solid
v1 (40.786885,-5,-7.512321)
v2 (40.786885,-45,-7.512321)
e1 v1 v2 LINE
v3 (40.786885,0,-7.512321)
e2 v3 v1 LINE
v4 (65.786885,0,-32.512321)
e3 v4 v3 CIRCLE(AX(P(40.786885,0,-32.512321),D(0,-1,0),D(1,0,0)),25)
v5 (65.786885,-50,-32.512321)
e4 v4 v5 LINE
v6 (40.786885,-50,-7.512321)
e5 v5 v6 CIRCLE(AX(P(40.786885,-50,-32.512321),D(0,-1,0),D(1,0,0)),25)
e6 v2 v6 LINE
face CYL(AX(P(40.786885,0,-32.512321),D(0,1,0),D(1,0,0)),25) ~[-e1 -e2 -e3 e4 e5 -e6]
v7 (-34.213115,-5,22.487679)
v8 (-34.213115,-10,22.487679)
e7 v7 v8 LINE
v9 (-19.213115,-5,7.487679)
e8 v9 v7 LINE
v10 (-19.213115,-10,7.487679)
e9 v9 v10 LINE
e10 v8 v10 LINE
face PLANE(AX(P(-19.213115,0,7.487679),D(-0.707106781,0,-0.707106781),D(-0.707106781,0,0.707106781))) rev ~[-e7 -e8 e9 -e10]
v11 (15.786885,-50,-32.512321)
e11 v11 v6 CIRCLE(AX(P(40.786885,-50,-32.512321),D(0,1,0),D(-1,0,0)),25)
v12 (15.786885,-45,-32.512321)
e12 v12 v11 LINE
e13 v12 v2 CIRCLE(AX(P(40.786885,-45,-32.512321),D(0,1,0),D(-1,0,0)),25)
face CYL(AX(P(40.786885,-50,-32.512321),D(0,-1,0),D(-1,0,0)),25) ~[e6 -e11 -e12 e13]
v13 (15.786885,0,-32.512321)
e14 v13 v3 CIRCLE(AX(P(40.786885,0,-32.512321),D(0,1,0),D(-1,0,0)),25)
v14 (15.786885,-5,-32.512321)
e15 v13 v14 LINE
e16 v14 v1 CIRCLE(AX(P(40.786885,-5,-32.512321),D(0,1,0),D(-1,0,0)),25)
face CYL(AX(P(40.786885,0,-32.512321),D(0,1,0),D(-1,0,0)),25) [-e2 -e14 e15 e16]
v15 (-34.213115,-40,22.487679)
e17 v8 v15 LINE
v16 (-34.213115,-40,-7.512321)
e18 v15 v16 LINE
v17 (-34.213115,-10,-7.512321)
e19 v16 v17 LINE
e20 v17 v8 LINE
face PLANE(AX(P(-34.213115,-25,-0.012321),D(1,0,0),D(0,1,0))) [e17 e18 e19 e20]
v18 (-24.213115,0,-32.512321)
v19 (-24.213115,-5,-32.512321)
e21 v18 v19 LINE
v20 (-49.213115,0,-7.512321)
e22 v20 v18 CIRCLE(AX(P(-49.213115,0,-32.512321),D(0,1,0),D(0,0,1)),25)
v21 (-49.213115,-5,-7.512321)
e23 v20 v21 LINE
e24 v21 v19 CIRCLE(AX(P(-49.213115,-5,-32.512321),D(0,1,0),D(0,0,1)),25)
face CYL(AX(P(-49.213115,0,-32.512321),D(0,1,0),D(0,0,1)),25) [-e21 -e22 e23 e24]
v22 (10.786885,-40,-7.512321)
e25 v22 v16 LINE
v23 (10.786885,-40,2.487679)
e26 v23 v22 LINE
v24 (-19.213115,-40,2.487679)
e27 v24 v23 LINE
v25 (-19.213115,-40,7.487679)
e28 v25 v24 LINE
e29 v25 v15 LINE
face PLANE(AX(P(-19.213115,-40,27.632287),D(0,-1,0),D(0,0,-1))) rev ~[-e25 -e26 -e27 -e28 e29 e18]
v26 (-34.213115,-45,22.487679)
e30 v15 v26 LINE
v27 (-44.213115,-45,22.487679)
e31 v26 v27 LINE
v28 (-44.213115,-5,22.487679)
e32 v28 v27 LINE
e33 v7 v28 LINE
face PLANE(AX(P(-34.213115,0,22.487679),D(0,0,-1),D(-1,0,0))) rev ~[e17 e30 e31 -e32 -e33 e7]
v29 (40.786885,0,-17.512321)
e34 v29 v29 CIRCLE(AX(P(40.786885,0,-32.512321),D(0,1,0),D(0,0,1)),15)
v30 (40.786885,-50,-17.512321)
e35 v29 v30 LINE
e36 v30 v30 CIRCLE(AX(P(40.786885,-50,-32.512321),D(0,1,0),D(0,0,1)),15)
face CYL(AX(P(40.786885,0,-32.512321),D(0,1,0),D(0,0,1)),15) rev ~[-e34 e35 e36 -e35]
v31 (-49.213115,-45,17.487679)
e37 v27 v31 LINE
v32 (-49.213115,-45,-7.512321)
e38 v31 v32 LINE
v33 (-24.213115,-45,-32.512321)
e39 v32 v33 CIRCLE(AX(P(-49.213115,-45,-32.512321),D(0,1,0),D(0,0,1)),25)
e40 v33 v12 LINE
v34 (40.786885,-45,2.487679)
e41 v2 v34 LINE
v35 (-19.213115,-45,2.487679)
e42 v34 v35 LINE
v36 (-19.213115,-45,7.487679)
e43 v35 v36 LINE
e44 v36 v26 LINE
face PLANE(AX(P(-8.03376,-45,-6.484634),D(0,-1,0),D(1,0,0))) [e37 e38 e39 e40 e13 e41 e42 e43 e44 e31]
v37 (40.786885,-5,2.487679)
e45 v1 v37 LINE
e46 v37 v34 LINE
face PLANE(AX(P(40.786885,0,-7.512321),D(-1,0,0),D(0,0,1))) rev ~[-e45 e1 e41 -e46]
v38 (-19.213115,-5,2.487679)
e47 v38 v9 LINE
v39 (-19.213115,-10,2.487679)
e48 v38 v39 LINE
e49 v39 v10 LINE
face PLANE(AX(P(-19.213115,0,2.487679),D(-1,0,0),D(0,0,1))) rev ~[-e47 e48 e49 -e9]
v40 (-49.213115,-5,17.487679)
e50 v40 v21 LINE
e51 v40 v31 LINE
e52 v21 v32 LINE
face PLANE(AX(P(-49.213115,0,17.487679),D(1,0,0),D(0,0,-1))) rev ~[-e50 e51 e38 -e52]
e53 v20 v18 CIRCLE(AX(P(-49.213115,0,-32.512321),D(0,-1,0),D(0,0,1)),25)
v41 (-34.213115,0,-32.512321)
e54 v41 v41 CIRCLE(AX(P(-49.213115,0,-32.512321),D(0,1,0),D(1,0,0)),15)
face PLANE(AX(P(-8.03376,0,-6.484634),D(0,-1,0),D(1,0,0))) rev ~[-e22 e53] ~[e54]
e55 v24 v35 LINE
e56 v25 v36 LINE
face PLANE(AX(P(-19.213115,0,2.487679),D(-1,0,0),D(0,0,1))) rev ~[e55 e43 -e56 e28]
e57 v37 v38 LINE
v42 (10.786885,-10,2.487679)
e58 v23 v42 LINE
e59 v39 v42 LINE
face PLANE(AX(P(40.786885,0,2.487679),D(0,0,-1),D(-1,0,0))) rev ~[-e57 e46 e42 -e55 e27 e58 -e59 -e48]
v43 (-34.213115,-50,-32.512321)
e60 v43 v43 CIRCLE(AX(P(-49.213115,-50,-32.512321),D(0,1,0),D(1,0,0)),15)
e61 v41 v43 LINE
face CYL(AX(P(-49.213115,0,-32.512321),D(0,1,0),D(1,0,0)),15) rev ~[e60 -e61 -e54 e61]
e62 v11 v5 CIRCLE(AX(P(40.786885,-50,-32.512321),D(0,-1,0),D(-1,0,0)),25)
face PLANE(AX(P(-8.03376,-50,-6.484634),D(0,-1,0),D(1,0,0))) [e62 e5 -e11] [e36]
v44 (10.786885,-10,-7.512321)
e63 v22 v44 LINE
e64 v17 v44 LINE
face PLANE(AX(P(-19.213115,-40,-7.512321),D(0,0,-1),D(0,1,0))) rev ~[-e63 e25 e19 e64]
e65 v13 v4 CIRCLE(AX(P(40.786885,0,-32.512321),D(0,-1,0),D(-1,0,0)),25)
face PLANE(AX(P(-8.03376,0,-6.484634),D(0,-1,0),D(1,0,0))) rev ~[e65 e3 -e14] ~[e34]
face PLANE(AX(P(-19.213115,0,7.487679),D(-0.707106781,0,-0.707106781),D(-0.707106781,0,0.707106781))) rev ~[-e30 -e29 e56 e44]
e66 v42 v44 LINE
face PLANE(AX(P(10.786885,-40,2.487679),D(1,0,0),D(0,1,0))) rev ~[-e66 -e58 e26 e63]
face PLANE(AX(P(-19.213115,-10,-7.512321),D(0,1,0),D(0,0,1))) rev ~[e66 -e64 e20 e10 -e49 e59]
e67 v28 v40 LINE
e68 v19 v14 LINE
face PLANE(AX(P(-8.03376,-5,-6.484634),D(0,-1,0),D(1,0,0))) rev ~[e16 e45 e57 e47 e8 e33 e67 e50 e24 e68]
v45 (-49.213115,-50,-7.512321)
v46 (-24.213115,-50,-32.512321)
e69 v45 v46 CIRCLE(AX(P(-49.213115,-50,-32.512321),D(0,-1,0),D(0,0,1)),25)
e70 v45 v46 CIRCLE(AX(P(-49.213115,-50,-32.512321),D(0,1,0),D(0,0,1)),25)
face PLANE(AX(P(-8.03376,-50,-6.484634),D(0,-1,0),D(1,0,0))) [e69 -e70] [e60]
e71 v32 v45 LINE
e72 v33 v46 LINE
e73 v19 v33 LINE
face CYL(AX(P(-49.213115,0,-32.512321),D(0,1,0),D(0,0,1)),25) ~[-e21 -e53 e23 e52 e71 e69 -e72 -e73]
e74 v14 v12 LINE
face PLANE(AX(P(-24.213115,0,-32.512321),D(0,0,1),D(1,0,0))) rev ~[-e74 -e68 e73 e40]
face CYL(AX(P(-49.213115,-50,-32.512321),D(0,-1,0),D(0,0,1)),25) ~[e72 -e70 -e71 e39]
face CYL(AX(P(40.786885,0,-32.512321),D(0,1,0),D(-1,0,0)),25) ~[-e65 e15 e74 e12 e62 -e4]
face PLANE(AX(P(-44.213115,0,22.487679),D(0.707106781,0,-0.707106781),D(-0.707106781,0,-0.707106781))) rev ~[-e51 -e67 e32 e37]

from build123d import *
from build123d import SkipClean  # not in build123d's __all__

# Parameters (mm, degrees)
F1_DEPTH = 50
F2_DEPTH = 5
F4_DEPTH = 5
F5_W     = 30
F5_H     = 30
F6_DEPTH = 10
F7_W     = 30
F7_H     = 20.1446080953
F8_DEPTH = 15


with BuildPart() as f1:
    # F0 (on Front) → F1 (new body)
    with BuildSketch(Plane.XZ):
        with BuildLine():
            Line((-34.2131151259, 22.4876786768), (-44.2131151259, 22.4876786768))
            Line((-44.2131151259, 22.4876786768), (-49.2131151259, 17.4876786768))
            Line((-49.2131151259, 17.4876786768), (-49.2131151259, -7.5123213232))
            ThreePointArc((-49.2131151259, -7.5123213232), (-31.5354455962, -14.8346517935), (-24.2131151259, -32.5123213232))
            Line((-24.2131151259, -32.5123213232), (15.7868848741, -32.5123213232))
            ThreePointArc((15.7868848741, -32.5123213232), (23.1092153444, -14.8346517935), (40.7868848741, -7.5123213232))
            Line((40.7868848741, -7.5123213232), (40.7868848741, 2.4876786768))
            Line((40.7868848741, 2.4876786768), (-19.2131151259, 2.4876786768))
            Line((-19.2131151259, 2.4876786768), (-19.2131151259, 7.4876786768))
            Line((-19.2131151259, 7.4876786768), (-34.2131151259, 22.4876786768))
        make_face()
        with BuildLine():
            Line((-49.2131151259, -17.5123213232), (-49.2131151259, -7.5123213232))
            ThreePointArc((-49.2131151259, -7.5123213232), (-66.8907846556, -50.1899908528), (-24.2131151259, -32.5123213232))
            Line((-24.2131151259, -32.5123213232), (-34.2131151259, -32.5123213232))
            ThreePointArc((-34.2131151259, -32.5123213232), (-59.8197168437, -43.118923041), (-49.2131151259, -17.5123213232))
        make_face()
        with BuildLine():
            ThreePointArc((-24.2131151259, -32.5123213232), (-31.5354455962, -14.8346517935), (-49.2131151259, -7.5123213232))
            Line((-49.2131151259, -7.5123213232), (-49.2131151259, -17.5123213232))
            ThreePointArc((-49.2131151259, -17.5123213232), (-38.6065134081, -21.9057196054), (-34.2131151259, -32.5123213232))
            Line((-34.2131151259, -32.5123213232), (-24.2131151259, -32.5123213232))
        make_face()
        with BuildLine():
            ThreePointArc((40.7868848741, -7.5123213232), (23.1092153444, -14.8346517935), (15.7868848741, -32.5123213232))
            Line((15.7868848741, -32.5123213232), (25.7868848741, -32.5123213232))
            ThreePointArc((25.7868848741, -32.5123213232), (30.1802831563, -21.9057196054), (40.7868848741, -17.5123213232))
            Line((40.7868848741, -17.5123213232), (40.7868848741, -7.5123213232))
        make_face()
        with BuildLine():
            Line((25.7868848741, -32.5123213232), (15.7868848741, -32.5123213232))
            ThreePointArc((15.7868848741, -32.5123213232), (40.7868848741, -57.5123213232), (65.7868848741, -32.5123213232))
            ThreePointArc((65.7868848741, -32.5123213232), (58.4645544038, -14.8346517935), (40.7868848741, -7.5123213232))
            Line((40.7868848741, -7.5123213232), (40.7868848741, -17.5123213232))
            ThreePointArc((40.7868848741, -17.5123213232), (51.3934865919, -21.9057196054), (55.7868848741, -32.5123213232))
            ThreePointArc((55.7868848741, -32.5123213232), (40.7868848741, -47.5123213232), (25.7868848741, -32.5123213232))
        make_face()
    extrude(amount=F1_DEPTH)

    # F0 (on Front) → F2 (cut)
    with BuildSketch(Plane.XZ):
        with BuildLine():
            Line((-34.2131151259, 22.4876786768), (-44.2131151259, 22.4876786768))
            Line((-44.2131151259, 22.4876786768), (-49.2131151259, 17.4876786768))
            Line((-49.2131151259, 17.4876786768), (-49.2131151259, -7.5123213232))
            ThreePointArc((-49.2131151259, -7.5123213232), (-31.5354455962, -14.8346517935), (-24.2131151259, -32.5123213232))
            Line((-24.2131151259, -32.5123213232), (15.7868848741, -32.5123213232))
            ThreePointArc((15.7868848741, -32.5123213232), (23.1092153444, -14.8346517935), (40.7868848741, -7.5123213232))
            Line((40.7868848741, -7.5123213232), (40.7868848741, 2.4876786768))
            Line((40.7868848741, 2.4876786768), (-19.2131151259, 2.4876786768))
            Line((-19.2131151259, 2.4876786768), (-19.2131151259, 7.4876786768))
            Line((-19.2131151259, 7.4876786768), (-34.2131151259, 22.4876786768))
        make_face()
    extrude(amount=F2_DEPTH, mode=Mode.SUBTRACT)

    # F3 (on face) → F4 (cut)
    with BuildSketch(Plane.XZ.offset(50)):
        with BuildLine():
            Line((-34.2131151259, 22.4876786768), (-44.2131151259, 22.4876786768))
            Line((-44.2131151259, 22.4876786768), (-49.2131151259, 17.4876786768))
            Line((-49.2131151259, 17.4876786768), (-49.2131151259, -7.5123213232))
            ThreePointArc((-49.2131151259, -7.5123213232), (-31.5354455962, -14.8346517935), (-24.2131151259, -32.5123213232))
            Line((-24.2131151259, -32.5123213232), (15.7868848741, -32.5123213232))
            ThreePointArc((15.7868848741, -32.5123213232), (23.1092153444, -14.8346517935), (40.7868848741, -7.5123213232))
            Line((40.7868848741, -7.5123213232), (40.7868848741, 2.4876786768))
            Line((40.7868848741, 2.4876786768), (-19.2131151259, 2.4876786768))
            Line((-19.2131151259, 2.4876786768), (-19.2131151259, 7.4876786768))
            Line((-19.2131151259, 7.4876786768), (-34.2131151259, 22.4876786768))
        make_face()
    with SkipClean():  # cleaning this boolean's faces spoils the solid; the shape is the same uncleaned
        extrude(amount=-F4_DEPTH, mode=Mode.SUBTRACT)

    # F5 (on face) → F6 (cut)
    with BuildSketch(Plane.XY.offset(2.4876786768)):
        with Locations((-4.2131151259, -25)):
            Rectangle(F5_W, F5_H)
    extrude(amount=-F6_DEPTH, mode=Mode.SUBTRACT)

    # F7 (on face) → F8 (cut)
    with BuildSketch(Plane.YZ.offset(-19.2131151259)):
        Polygon((-40, 2.4876786768), (-40, -7.5123213232), (-10, -7.5123213232), (-10, 2.4876786768), (-10, 7.4876786768), (-40, 7.4876786768), align=None)
        with Locations((-25, 17.5599827245)):
            Rectangle(F7_W, F7_H)
    extrude(amount=-F8_DEPTH, mode=Mode.SUBTRACT)


solid = f1.part
